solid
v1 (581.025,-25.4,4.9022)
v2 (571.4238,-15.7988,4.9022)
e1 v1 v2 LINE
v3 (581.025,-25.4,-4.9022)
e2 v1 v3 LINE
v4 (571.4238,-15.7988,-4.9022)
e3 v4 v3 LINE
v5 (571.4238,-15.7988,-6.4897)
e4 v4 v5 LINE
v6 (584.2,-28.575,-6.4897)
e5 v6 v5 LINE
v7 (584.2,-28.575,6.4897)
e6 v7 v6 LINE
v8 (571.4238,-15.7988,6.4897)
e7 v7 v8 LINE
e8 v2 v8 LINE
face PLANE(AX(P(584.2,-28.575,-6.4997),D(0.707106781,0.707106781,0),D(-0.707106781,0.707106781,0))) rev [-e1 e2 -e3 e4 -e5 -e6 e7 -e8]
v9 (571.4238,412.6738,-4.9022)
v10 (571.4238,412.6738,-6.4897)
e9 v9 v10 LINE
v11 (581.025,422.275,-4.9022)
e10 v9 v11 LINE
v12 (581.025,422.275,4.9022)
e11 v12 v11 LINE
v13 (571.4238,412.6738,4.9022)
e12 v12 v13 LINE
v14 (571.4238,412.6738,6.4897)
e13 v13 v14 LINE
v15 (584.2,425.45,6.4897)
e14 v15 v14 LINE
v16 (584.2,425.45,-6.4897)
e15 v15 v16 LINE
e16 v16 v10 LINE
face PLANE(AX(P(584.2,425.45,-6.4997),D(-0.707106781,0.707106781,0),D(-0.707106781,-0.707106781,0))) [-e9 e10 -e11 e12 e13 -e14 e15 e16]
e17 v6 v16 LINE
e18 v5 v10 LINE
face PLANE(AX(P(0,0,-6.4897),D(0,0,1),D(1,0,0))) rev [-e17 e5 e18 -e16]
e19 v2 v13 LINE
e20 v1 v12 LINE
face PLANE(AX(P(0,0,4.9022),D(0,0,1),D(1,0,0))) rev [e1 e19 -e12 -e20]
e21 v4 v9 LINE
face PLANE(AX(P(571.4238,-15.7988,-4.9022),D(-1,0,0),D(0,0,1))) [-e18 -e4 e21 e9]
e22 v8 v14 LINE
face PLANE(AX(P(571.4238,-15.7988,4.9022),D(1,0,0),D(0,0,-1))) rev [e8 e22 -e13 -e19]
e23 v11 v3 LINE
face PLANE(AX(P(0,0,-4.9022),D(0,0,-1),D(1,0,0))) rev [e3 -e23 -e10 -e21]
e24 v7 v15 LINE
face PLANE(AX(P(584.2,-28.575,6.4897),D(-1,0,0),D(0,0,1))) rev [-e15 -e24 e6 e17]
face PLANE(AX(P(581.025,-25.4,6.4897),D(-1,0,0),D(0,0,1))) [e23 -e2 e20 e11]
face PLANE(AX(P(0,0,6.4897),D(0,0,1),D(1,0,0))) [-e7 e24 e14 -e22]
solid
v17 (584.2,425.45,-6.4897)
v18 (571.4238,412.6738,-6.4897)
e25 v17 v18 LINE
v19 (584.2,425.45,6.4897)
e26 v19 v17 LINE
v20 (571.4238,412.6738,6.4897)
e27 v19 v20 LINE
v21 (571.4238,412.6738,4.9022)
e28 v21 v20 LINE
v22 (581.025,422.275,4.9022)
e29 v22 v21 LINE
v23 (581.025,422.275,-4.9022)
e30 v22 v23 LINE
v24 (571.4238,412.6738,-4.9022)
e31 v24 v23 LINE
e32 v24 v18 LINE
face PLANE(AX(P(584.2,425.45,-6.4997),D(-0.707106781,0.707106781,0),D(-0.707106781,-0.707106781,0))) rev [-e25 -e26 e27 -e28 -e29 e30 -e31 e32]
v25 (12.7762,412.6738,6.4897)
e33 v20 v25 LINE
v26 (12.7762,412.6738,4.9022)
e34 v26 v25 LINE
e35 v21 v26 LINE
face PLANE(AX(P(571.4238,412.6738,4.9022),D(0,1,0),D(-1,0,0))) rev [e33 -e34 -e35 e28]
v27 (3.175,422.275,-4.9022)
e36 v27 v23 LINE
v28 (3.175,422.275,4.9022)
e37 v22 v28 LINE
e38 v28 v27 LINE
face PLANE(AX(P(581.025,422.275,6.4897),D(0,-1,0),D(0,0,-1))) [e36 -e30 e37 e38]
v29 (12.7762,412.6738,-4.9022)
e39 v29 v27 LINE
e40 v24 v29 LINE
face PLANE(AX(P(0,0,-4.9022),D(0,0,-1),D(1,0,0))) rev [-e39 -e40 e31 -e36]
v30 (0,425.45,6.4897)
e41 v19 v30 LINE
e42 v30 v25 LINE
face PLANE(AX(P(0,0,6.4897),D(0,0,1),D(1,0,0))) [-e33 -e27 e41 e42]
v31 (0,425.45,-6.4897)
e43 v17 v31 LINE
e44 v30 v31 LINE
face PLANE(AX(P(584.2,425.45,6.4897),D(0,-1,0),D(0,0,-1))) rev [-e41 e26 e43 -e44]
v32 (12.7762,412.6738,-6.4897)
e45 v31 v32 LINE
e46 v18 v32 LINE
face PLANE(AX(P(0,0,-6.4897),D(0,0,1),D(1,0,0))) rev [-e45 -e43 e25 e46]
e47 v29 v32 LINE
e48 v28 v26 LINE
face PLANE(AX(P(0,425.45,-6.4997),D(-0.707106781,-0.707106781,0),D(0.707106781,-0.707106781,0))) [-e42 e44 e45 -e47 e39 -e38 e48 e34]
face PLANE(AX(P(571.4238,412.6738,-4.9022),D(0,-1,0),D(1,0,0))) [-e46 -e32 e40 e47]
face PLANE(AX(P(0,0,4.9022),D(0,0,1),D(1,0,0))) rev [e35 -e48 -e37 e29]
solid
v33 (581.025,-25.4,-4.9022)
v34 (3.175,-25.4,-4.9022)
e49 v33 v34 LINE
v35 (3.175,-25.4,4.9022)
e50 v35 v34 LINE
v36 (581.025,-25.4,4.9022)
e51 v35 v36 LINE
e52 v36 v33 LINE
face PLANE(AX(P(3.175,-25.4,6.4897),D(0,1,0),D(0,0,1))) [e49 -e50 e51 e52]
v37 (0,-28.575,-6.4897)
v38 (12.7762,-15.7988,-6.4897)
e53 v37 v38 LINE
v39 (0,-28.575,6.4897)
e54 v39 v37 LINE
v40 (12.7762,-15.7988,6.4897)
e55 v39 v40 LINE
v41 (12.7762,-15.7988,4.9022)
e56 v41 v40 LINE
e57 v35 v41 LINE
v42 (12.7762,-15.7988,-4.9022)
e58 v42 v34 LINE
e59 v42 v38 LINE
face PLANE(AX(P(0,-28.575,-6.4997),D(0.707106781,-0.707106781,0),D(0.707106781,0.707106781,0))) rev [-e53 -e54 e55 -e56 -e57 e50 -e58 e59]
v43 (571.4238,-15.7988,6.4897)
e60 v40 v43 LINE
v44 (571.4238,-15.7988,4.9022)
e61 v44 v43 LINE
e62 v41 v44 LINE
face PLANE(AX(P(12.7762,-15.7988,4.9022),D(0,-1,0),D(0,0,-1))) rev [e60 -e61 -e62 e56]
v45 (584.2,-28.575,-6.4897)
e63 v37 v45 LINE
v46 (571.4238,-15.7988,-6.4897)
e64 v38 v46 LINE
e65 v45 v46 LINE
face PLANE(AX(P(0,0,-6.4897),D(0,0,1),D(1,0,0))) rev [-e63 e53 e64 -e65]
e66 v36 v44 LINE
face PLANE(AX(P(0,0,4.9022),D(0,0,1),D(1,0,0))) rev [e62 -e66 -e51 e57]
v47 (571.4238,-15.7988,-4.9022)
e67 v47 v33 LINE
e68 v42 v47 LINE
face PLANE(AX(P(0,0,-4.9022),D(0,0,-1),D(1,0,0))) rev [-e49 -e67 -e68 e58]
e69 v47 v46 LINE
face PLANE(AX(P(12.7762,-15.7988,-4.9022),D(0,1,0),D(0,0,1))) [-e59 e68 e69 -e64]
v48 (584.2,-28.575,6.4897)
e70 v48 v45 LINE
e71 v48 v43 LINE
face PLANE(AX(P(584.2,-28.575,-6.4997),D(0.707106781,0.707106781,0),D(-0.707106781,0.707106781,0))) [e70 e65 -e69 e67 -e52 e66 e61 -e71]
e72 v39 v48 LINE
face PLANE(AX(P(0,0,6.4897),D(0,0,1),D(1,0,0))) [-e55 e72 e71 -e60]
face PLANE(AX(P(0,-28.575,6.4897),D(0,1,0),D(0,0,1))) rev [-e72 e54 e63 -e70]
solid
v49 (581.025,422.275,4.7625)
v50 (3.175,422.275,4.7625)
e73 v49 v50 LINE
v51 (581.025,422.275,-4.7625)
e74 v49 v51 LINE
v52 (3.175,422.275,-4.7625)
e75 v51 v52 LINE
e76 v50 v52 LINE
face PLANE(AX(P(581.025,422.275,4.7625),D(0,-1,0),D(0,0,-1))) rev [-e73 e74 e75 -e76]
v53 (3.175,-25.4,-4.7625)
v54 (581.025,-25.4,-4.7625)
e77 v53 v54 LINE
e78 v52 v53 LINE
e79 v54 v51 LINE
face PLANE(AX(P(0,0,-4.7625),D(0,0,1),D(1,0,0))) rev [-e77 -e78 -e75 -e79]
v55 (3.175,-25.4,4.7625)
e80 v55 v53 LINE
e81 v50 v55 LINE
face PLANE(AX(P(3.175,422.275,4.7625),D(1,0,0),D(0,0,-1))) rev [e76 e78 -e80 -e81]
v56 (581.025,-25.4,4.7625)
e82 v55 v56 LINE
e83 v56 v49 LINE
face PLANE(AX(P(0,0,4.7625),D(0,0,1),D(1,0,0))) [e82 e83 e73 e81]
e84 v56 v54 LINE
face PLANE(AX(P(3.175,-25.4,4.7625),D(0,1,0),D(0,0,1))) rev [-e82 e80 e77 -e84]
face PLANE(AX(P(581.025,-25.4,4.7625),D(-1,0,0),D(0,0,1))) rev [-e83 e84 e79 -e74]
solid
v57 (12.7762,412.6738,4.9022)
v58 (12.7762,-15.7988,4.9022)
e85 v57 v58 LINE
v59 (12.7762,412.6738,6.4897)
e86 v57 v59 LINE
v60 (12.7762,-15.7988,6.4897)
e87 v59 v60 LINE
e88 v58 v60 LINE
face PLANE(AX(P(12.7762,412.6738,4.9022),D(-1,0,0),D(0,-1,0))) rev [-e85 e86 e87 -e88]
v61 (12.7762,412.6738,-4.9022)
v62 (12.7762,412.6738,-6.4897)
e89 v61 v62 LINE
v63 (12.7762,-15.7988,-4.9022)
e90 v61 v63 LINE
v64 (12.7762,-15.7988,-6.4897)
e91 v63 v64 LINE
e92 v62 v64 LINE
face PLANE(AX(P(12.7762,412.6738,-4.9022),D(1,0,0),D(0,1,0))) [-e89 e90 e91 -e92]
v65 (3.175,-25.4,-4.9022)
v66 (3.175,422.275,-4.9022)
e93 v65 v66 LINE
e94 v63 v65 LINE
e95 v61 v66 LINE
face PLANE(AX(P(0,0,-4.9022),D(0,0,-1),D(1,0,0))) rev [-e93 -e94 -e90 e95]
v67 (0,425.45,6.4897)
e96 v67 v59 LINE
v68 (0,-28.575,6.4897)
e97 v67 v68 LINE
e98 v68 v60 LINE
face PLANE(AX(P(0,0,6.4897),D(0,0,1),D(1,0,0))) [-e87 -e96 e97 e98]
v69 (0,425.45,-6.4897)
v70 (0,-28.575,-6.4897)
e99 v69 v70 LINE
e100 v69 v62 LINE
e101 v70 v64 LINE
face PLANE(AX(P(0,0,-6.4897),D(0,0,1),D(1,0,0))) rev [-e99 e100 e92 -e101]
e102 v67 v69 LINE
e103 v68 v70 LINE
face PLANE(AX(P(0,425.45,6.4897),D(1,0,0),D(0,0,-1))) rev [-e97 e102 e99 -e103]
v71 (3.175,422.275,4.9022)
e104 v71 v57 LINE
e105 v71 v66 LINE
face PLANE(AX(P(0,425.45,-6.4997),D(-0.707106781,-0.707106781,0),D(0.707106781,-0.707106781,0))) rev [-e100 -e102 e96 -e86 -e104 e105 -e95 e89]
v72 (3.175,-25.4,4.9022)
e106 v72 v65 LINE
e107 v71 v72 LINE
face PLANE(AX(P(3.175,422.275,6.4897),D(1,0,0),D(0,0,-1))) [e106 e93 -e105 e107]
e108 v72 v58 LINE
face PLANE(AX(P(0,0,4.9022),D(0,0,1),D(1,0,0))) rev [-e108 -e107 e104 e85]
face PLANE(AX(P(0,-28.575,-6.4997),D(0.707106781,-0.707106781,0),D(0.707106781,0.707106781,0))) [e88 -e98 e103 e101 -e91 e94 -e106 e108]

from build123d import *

# Parameters (mm, degrees)
SKETCH2_W           = 577.85
SKETCH2_H           = 447.675
BOSS_EXTRUDE1_DEPTH = 4.7625
SKETCH3_W           = 584.2
SKETCH3_H           = 454.025
SKETCH3_W_2         = 577.85
SKETCH3_H_2         = 447.675
BOSS_EXTRUDE2_DEPTH = 6.4897
SKETCH4_W           = 584.2
SKETCH4_H           = 454.025
SKETCH4_W_2         = 558.6476
SKETCH4_H_2         = 428.4726
BOSS_EXTRUDE3_DEPTH = 1.5875
SPLIT1_START        = -6.4897
SPLIT1_DEPTH        = 12.9794
SPLIT1_2_DEPTH      = 1.5875
SPLIT1_START_2      = 4.9022
SPLIT1_3_DEPTH      = 1.5875
SPLIT1_4_DEPTH      = 12.9794
SPLIT1_5_DEPTH      = 1.5875
SPLIT1_6_DEPTH      = 1.5875
SPLIT1_7_DEPTH      = 12.9794
SPLIT1_8_DEPTH      = 1.5875
SPLIT1_9_DEPTH      = 1.5875
SPLIT1_START_3      = -282.77030474
SPLIT1_10_OUTLINE_W = 322.113794703
SPLIT1_10_OUTLINE_H = 12.9794
SPLIT1_10_DEPTH     = 716.067662582
SPLIT1_START_4      = -300.838580056
SPLIT1_11_OUTLINE_W = 414.886205297
SPLIT1_11_OUTLINE_H = 12.9794
SPLIT1_11_DEPTH     = 321.044156328


# Read off the part's stored shape, not the designer's step: Split1
with BuildPart() as part:
    # Sketch2 → Boss-Extrude1 (new, symmetric)
    with BuildSketch(Plane.XY):
        with Locations((292.1, 198.4375)):
            Rectangle(SKETCH2_W, SKETCH2_H)
    extrude(amount=BOSS_EXTRUDE1_DEPTH, both=True)


with BuildPart() as body_2:
    # Sketch3 → Boss-Extrude2 (new, symmetric)
    with BuildSketch(Plane.XY):
        with Locations((292.1, 198.4375)):
            Rectangle(SKETCH3_W, SKETCH3_H)
        with Locations((292.1, 198.4375)):
            Rectangle(SKETCH3_W_2, SKETCH3_H_2, mode=Mode.SUBTRACT)
    extrude(amount=BOSS_EXTRUDE2_DEPTH, both=True)

    # Sketch4 → Boss-Extrude3 (add)
    with BuildSketch(Plane.XY.offset(6.4897)):
        with Locations((292.1, 198.4375)):
            Rectangle(SKETCH4_W, SKETCH4_H)
        with Locations((292.1, 198.4375)):
            Rectangle(SKETCH4_W_2, SKETCH4_H_2, mode=Mode.SUBTRACT)
    boss_extrude3 = extrude(amount=-BOSS_EXTRUDE3_DEPTH)

    # Mirror1: Boss-Extrude3 across plane
    add(boss_extrude3.mirror(Plane.XY))

    # Split1 10 outline → Split1 10 (cut)
    with BuildSketch(Plane(origin=(0, 0, 0), x_dir=(0.707106781186548, 0.707106781186547, 0), z_dir=(0.707106781186547, -0.707106781186548, 0)).offset(SPLIT1_START_3)):
        with Locations((553.943102649, 0)):
            Rectangle(SPLIT1_10_OUTLINE_W, SPLIT1_10_OUTLINE_H)
    extrude(amount=SPLIT1_10_DEPTH, mode=Mode.SUBTRACT)

    # Split1 11 outline → Split1 11 (cut)
    with BuildSketch(Plane(origin=(0, 0, 0), x_dir=(0.707106781186548, 0.707106781186547, 0), z_dir=(0.707106781186547, -0.707106781186548, 0)).offset(SPLIT1_START_4)):
        with Locations((185.443102649, 0)):
            Rectangle(SPLIT1_11_OUTLINE_W, SPLIT1_11_OUTLINE_H)
    extrude(amount=SPLIT1_11_DEPTH, mode=Mode.SUBTRACT)


with BuildPart() as body_3:
    # Split1 outline → Split1 (new body)
    with BuildSketch(Plane.XY.offset(SPLIT1_START)):
        Polygon((581.025, -25.4), (584.2, -28.575), (584.2, 425.45), (581.025, 422.275), align=None)
    extrude(amount=SPLIT1_DEPTH)

    # Split1 2 outline → Split1 2 (add)
    with BuildSketch(Plane.XY.offset(SPLIT1_START)):
        Polygon((571.4238, -15.7988), (581.025, -25.4), (581.025, 422.275), (571.4238, 412.6738), align=None)
    extrude(amount=SPLIT1_2_DEPTH)

    # Split1 3 outline → Split1 3 (add)
    with BuildSketch(Plane.XY.offset(SPLIT1_START_2)):
        Polygon((571.4238, -15.7988), (581.025, -25.4), (581.025, 422.275), (571.4238, 412.6738), align=None)
    extrude(amount=SPLIT1_3_DEPTH)


with BuildPart() as body_4:
    # Split1 4 outline → Split1 4 (new body)
    with BuildSketch(Plane.XY.offset(SPLIT1_START)):
        Polygon((581.025, 422.275), (584.2, 425.45), (0, 425.45), (3.175, 422.275), align=None)
    extrude(amount=SPLIT1_4_DEPTH)

    # Split1 5 outline → Split1 5 (add)
    with BuildSketch(Plane.XY.offset(SPLIT1_START)):
        Polygon((571.4238, 412.6738), (581.025, 422.275), (3.175, 422.275), (12.7762, 412.6738), align=None)
    extrude(amount=SPLIT1_5_DEPTH)

    # Split1 6 outline → Split1 6 (add)
    with BuildSketch(Plane.XY.offset(SPLIT1_START_2)):
        Polygon((571.4238, 412.6738), (581.025, 422.275), (3.175, 422.275), (12.7762, 412.6738), align=None)
    extrude(amount=SPLIT1_6_DEPTH)


with BuildPart() as body_5:
    # Split1 7 outline → Split1 7 (new body)
    with BuildSketch(Plane.XY.offset(SPLIT1_START)):
        Polygon((3.175, 422.275), (0, 425.45), (0, -28.575), (3.175, -25.4), align=None)
    extrude(amount=SPLIT1_7_DEPTH)

    # Split1 8 outline → Split1 8 (add)
    with BuildSketch(Plane.XY.offset(SPLIT1_START)):
        Polygon((12.7762, 412.6738), (3.175, 422.275), (3.175, -25.4), (12.7762, -15.7988), align=None)
    extrude(amount=SPLIT1_8_DEPTH)

    # Split1 9 outline → Split1 9 (add)
    with BuildSketch(Plane.XY.offset(SPLIT1_START_2)):
        Polygon((12.7762, 412.6738), (3.175, 422.275), (3.175, -25.4), (12.7762, -15.7988), align=None)
    extrude(amount=SPLIT1_9_DEPTH)


solid = Compound([part.part, body_2.part, body_3.part, body_4.part, body_5.part])
